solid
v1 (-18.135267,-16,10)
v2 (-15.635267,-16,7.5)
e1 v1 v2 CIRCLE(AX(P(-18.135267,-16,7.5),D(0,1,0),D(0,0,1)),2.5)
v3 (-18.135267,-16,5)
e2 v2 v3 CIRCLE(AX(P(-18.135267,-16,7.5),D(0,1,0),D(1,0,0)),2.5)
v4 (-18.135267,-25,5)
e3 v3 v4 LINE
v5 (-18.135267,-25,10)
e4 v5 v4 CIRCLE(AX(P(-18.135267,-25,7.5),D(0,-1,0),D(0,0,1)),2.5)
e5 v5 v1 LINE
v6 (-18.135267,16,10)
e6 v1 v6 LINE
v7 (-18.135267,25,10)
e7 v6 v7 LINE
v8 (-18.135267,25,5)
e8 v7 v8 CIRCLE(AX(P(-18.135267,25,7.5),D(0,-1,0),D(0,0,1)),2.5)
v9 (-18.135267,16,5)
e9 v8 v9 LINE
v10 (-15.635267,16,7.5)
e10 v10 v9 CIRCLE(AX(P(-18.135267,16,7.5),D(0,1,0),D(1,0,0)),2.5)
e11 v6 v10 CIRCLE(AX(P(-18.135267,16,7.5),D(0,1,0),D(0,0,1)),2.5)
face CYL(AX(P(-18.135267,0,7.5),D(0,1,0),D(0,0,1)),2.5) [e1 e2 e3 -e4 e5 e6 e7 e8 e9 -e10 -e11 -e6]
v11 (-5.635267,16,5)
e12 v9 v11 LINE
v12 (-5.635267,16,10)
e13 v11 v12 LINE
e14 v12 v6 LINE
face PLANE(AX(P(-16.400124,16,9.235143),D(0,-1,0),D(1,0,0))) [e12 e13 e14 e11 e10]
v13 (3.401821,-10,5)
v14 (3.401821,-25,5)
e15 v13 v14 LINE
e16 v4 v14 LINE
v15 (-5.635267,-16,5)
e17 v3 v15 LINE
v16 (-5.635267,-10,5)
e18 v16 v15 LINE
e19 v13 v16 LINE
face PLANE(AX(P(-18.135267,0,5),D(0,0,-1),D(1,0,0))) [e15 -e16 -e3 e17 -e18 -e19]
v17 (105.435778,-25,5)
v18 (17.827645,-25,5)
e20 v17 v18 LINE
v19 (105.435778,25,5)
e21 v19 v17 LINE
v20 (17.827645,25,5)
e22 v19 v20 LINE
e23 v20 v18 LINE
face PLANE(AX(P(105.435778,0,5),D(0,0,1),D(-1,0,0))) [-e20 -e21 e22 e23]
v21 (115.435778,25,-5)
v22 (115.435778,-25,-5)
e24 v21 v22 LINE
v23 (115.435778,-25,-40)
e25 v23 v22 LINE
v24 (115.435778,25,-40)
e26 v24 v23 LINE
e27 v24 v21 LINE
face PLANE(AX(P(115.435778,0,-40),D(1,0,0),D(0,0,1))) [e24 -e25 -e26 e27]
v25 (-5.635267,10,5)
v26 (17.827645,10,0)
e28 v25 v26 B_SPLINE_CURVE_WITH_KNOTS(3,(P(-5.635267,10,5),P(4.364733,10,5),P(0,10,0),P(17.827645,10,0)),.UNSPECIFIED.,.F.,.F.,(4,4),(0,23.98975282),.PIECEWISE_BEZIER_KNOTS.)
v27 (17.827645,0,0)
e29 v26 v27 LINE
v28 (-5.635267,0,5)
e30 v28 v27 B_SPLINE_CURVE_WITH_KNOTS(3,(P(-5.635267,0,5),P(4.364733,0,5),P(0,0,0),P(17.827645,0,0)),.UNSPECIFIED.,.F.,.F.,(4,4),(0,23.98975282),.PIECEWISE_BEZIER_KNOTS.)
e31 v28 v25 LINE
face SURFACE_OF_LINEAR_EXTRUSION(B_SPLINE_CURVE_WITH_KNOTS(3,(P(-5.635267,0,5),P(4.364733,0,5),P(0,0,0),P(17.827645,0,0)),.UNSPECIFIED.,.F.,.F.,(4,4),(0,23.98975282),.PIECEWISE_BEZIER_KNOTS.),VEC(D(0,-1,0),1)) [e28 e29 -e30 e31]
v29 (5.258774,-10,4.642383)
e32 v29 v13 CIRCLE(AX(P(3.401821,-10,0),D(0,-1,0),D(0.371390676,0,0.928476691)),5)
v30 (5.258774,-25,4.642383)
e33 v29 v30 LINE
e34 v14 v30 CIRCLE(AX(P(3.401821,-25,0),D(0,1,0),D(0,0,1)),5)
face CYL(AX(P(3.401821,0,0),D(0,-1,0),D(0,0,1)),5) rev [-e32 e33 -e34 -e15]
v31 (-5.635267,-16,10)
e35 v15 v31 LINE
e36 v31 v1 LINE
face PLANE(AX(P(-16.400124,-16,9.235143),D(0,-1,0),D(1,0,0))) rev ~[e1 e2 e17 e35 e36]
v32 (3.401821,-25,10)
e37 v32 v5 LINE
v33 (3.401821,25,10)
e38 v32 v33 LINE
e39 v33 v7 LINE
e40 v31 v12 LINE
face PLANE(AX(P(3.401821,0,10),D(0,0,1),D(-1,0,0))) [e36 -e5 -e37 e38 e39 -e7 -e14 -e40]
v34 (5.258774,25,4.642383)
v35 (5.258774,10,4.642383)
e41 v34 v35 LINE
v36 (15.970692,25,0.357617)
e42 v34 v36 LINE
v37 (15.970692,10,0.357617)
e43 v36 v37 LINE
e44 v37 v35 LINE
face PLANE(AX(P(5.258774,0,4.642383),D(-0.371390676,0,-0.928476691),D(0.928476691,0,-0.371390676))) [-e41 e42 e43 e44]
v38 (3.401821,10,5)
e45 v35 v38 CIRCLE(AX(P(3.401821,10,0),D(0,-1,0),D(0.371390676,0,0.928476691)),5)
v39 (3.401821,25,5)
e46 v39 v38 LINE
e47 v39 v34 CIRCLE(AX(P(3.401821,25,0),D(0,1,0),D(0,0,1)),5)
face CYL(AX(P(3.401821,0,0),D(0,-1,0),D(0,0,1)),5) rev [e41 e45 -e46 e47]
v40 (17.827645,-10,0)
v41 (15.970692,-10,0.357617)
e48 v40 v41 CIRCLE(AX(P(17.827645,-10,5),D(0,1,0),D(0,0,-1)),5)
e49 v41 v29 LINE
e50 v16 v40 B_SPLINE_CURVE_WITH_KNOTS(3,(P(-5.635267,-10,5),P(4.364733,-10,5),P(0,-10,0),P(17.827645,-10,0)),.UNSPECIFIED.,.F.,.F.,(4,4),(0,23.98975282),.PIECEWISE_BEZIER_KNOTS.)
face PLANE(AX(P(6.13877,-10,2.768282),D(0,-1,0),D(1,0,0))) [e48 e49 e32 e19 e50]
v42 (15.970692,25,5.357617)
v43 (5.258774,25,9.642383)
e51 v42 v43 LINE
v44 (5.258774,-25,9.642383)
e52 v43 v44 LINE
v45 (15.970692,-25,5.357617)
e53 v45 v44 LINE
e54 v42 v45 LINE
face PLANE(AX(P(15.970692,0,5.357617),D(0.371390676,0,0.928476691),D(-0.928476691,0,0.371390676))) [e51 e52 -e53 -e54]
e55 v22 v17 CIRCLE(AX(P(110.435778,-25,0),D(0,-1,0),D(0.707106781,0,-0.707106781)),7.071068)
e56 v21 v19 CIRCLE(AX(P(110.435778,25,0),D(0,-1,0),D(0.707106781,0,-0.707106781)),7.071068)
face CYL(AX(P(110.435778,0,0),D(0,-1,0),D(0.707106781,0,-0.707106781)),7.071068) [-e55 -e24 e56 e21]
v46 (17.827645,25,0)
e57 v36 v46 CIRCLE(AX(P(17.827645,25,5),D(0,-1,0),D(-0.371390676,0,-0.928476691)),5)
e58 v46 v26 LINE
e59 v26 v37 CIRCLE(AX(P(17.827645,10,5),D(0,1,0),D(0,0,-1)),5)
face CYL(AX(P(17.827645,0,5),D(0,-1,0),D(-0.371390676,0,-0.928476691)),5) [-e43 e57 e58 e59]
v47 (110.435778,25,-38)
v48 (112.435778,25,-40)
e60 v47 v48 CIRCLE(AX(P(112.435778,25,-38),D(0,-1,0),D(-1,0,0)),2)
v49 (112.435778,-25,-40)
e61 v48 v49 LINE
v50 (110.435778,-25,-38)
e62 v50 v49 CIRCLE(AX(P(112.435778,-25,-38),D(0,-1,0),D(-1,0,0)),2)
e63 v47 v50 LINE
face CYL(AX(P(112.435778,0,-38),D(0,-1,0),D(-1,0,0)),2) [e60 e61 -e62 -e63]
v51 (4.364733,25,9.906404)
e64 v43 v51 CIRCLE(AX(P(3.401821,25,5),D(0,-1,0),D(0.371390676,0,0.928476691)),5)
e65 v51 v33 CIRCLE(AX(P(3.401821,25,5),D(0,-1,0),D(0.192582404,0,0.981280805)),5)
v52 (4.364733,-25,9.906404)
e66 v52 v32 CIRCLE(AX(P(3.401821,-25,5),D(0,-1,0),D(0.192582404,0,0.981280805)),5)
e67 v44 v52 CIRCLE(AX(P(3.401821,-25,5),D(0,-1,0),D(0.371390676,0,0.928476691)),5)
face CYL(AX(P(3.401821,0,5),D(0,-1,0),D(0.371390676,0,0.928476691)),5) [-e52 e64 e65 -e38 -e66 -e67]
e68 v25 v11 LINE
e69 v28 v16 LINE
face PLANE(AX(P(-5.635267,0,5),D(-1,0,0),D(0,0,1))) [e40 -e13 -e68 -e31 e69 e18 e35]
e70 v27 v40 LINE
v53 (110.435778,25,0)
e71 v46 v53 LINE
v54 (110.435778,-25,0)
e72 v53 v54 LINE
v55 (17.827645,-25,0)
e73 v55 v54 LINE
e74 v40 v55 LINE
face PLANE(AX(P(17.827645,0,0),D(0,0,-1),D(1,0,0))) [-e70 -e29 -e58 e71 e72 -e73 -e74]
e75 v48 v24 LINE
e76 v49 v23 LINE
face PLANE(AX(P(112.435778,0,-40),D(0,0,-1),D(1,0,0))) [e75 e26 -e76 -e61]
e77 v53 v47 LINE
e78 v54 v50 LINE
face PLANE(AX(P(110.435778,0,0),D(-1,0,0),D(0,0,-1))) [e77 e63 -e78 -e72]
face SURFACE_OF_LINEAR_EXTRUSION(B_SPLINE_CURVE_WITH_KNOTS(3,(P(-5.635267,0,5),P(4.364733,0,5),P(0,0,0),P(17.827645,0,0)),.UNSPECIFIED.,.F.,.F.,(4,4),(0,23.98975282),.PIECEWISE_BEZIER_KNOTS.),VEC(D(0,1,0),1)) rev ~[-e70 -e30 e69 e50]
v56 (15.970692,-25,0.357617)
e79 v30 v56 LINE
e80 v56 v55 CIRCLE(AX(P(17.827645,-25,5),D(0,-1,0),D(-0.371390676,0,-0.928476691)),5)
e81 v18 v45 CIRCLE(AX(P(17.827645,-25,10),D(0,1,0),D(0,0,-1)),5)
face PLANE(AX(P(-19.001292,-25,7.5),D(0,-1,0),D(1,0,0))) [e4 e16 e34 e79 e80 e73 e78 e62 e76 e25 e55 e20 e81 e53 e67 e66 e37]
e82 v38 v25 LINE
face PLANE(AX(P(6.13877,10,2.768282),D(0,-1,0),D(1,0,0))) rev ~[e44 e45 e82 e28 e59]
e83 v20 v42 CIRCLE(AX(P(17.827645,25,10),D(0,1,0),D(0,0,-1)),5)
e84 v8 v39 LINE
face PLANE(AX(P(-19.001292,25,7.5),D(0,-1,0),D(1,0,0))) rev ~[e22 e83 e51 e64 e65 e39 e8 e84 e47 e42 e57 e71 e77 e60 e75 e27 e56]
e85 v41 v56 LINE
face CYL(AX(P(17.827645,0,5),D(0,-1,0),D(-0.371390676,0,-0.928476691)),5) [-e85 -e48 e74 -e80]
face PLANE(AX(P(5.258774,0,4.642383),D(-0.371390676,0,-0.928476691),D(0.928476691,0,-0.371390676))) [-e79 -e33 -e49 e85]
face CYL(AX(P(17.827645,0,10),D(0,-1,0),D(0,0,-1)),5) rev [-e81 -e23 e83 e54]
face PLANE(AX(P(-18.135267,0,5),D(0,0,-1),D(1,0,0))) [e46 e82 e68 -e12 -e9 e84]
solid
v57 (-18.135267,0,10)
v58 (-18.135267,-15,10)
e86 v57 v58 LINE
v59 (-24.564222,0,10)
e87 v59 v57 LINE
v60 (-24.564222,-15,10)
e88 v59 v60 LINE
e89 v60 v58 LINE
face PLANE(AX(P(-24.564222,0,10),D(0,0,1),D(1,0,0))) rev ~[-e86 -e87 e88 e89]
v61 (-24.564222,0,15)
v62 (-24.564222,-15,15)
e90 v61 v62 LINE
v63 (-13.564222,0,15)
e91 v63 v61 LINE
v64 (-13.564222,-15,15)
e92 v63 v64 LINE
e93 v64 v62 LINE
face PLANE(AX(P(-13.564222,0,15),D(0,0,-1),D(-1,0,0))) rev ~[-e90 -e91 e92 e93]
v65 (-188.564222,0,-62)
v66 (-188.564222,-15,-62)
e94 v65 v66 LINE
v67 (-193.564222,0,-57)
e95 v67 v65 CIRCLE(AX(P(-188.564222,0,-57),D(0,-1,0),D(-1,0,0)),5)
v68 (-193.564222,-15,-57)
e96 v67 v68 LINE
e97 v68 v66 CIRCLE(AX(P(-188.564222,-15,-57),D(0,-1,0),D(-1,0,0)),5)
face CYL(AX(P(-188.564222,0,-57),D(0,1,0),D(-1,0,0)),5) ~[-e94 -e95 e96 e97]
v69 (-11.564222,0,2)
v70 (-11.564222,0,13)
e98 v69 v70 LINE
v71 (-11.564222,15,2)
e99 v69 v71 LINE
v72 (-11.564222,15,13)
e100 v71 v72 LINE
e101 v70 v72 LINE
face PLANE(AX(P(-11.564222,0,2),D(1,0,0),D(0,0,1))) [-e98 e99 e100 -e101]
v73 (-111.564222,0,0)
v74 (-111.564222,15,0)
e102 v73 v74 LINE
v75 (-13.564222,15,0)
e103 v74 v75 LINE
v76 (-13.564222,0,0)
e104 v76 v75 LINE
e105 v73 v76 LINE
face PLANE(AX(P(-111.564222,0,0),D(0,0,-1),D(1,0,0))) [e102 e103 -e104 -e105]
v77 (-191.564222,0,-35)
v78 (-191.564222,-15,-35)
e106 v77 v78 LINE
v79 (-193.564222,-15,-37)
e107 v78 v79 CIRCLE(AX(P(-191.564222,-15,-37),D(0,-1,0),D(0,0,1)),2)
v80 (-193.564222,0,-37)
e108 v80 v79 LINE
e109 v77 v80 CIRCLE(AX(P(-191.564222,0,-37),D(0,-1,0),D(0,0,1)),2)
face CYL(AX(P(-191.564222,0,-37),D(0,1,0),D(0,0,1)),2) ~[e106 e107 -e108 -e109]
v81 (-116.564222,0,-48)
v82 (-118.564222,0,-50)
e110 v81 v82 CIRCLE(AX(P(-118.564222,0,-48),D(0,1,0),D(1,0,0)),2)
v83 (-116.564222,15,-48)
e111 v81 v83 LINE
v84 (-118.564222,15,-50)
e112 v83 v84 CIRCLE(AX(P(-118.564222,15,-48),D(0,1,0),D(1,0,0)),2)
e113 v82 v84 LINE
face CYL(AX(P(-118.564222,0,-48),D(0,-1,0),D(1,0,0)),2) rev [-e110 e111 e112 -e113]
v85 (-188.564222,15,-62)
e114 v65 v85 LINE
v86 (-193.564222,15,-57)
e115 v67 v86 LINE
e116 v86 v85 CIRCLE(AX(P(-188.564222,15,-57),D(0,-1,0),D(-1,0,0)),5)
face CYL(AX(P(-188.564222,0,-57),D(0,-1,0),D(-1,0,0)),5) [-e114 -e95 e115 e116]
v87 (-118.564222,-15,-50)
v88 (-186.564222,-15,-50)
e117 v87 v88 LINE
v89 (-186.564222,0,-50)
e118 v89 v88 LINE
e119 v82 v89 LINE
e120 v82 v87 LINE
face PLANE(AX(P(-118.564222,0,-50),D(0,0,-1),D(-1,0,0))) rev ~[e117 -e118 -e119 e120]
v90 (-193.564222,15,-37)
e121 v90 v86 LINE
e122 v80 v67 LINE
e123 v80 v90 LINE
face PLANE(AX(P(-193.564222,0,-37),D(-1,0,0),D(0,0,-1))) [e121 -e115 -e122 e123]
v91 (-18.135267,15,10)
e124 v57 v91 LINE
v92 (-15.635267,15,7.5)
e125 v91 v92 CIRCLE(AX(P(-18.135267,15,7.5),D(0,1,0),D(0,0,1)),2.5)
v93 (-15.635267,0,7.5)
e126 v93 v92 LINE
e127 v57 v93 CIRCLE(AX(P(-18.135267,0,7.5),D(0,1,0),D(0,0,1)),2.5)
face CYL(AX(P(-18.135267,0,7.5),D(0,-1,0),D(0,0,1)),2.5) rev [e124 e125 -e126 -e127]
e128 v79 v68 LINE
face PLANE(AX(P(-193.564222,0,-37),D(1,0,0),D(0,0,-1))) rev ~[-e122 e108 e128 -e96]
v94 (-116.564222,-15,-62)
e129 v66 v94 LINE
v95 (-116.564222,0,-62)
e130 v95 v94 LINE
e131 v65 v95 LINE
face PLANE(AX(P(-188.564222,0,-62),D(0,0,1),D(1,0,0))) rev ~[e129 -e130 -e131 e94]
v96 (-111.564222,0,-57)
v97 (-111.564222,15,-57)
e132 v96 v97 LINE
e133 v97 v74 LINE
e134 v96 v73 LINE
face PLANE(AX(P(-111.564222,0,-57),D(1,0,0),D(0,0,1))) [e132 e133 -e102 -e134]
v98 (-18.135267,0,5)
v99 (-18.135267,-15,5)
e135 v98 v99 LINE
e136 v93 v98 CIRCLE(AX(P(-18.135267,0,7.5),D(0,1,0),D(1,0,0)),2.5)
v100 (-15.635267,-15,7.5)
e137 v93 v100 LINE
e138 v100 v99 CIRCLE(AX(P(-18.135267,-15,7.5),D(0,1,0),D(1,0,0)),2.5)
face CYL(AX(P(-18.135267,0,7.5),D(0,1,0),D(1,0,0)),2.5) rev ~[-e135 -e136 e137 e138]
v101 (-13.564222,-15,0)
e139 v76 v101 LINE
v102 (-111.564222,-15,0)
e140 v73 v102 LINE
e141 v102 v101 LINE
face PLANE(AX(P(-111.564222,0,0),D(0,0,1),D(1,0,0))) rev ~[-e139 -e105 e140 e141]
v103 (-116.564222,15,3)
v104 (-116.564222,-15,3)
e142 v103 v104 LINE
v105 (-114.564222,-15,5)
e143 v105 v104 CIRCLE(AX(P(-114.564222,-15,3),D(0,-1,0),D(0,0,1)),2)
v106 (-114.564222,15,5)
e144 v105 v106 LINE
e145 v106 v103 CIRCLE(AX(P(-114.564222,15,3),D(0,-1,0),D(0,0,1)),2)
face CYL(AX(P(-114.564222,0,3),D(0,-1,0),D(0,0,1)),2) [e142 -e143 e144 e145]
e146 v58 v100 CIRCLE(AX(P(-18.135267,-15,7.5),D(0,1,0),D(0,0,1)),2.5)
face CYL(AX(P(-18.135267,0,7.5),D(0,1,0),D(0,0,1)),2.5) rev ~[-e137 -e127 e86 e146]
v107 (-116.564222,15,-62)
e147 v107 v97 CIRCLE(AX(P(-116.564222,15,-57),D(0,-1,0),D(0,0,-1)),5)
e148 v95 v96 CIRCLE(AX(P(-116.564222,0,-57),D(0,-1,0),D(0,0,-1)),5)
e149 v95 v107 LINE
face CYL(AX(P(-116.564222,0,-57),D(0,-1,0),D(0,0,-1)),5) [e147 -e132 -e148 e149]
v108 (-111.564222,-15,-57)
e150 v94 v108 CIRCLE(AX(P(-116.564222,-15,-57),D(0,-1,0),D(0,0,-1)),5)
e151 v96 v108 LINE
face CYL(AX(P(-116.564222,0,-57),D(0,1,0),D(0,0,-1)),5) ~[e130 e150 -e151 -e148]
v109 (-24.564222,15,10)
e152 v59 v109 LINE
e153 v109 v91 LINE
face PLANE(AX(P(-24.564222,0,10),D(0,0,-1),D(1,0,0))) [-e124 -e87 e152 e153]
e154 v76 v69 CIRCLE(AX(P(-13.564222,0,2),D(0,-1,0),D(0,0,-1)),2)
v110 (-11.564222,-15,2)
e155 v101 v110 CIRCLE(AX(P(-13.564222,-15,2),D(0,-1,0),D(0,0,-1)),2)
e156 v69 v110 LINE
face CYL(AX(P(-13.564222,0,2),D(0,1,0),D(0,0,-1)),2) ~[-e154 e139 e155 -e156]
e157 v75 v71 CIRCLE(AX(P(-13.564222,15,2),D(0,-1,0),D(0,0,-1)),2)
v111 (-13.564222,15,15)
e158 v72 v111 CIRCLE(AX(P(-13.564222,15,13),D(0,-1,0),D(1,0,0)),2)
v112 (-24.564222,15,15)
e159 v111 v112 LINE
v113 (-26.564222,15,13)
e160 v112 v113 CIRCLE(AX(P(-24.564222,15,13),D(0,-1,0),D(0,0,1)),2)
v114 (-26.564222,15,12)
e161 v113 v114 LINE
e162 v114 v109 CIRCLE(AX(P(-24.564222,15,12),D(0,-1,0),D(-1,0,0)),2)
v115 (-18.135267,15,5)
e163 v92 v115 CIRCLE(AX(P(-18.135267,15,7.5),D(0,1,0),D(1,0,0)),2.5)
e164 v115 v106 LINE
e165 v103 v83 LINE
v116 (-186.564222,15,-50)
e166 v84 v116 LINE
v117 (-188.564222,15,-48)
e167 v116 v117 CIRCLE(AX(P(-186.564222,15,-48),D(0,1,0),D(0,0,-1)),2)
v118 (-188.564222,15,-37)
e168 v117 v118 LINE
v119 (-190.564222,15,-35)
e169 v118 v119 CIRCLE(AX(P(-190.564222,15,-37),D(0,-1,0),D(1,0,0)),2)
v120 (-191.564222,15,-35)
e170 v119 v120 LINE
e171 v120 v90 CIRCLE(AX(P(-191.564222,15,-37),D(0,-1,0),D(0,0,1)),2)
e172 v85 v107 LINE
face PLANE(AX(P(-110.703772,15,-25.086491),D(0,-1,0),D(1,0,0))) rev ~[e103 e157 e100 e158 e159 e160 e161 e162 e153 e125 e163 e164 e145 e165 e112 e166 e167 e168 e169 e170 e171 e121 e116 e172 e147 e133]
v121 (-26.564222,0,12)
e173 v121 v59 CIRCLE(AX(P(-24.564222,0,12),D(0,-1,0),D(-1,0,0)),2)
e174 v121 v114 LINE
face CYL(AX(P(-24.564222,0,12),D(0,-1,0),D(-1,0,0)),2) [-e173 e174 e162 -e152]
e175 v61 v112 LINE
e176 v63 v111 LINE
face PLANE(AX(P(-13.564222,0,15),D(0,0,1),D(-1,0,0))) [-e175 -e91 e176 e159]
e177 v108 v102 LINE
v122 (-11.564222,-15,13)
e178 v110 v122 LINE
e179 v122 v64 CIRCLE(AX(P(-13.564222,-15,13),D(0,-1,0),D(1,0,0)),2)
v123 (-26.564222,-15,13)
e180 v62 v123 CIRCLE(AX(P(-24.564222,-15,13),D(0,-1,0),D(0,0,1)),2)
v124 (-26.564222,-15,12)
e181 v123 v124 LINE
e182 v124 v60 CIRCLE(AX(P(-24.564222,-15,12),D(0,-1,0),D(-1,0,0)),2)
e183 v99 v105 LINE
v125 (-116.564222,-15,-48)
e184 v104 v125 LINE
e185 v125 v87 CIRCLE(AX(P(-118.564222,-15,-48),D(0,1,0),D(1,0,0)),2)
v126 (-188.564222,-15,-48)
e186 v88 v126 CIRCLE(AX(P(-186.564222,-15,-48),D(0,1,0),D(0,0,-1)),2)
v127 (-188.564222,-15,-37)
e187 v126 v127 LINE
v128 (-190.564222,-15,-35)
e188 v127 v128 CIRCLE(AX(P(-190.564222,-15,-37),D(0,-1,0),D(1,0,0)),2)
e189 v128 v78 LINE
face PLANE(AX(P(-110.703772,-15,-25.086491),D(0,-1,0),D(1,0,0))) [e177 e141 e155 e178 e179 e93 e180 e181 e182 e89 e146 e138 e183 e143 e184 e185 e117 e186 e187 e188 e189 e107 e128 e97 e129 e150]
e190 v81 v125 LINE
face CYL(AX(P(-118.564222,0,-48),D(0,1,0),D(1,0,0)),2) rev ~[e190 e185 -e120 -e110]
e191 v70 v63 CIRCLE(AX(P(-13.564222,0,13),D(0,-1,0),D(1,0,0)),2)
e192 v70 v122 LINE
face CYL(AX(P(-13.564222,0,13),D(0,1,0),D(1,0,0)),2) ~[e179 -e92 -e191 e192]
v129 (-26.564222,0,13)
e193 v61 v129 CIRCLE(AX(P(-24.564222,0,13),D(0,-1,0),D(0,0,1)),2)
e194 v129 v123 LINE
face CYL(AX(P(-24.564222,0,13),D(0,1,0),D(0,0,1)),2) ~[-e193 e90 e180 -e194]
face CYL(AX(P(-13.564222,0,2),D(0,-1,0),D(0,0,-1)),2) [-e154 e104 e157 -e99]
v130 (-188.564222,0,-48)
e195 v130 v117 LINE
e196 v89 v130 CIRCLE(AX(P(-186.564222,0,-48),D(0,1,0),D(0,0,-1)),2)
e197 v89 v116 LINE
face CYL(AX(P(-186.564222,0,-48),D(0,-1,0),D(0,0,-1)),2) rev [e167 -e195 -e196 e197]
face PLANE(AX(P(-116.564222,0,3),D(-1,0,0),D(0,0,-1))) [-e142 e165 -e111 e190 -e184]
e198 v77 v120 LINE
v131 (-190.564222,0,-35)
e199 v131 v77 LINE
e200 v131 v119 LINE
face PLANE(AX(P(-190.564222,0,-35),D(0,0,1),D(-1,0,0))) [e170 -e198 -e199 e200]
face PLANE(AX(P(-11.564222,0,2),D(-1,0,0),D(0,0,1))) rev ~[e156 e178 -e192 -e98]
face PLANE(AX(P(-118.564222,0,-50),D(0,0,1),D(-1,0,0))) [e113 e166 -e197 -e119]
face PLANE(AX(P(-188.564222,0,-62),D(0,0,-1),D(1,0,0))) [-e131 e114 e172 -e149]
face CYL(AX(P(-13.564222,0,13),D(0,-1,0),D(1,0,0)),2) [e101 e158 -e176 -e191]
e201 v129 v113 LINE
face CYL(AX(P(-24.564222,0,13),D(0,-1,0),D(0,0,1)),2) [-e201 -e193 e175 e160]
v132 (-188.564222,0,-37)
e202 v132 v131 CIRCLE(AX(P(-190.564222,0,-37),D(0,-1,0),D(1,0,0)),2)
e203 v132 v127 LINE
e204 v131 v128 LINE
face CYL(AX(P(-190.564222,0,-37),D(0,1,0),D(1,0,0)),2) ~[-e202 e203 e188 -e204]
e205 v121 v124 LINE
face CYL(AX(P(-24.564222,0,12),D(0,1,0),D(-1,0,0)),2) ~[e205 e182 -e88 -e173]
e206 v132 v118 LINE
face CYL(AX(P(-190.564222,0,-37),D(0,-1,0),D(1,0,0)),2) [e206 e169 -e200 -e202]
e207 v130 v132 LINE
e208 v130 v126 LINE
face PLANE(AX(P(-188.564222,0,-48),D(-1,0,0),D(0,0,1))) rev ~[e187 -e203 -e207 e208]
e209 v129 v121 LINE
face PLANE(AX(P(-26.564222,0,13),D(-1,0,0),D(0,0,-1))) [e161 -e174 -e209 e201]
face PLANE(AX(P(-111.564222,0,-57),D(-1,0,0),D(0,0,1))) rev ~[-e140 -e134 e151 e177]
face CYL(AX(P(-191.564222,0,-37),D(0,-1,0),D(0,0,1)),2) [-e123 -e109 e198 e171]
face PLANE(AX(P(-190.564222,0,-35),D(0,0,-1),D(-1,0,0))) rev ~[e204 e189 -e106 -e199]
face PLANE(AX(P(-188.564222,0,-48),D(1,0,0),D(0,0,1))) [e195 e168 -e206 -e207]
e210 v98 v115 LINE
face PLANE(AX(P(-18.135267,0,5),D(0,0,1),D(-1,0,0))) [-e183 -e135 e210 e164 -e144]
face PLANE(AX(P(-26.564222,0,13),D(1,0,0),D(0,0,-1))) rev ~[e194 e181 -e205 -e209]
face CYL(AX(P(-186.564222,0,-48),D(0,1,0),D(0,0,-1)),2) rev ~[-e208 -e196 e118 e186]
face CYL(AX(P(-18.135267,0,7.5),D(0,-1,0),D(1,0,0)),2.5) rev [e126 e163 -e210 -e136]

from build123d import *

# Parameters (mm, degrees)
F1_DEPTH      = 15
F1_DEPTH_BACK = 15
F0_W          = 5.9289547801
F0_H          = 5
F2_DEPTH      = 25
F2_DEPTH_BACK = 25
F3_DEPTH      = 16
F3_DEPTH_BACK = 16
F4_DEPTH      = 10
F4_DEPTH_BACK = 10


with BuildPart() as f1:
    # F0 (on Front) → F1 (new body, two sides)
    with BuildSketch(Plane.XZ) as f1_sk:
        with BuildLine():
            Line((-18.1352669001, 5), (-111.5642216802, 5))
            Line((-111.5642216802, 5), (-114.5642216802, 5))
            ThreePointArc((-114.5642216802, 5), (-115.9784352425, 4.4142135624), (-116.5642216802, 3))
            Line((-116.5642216802, 3), (-116.5642216802, -48))
            ThreePointArc((-116.5642216802, -48), (-117.1500081178, -49.4142135624), (-118.5642216802, -50))
            Line((-118.5642216802, -50), (-186.5642216802, -50))
            ThreePointArc((-186.5642216802, -50), (-187.9784352425, -49.4142135624), (-188.5642216802, -48))
            Line((-188.5642216802, -48), (-188.5642216802, -37))
            ThreePointArc((-188.5642216802, -37), (-189.1500081178, -35.5857864376), (-190.5642216802, -35))
            Line((-190.5642216802, -35), (-191.5642216802, -35))
            ThreePointArc((-191.5642216802, -35), (-192.9784352425, -35.5857864376), (-193.5642216802, -37))
            Line((-193.5642216802, -37), (-193.5642216802, -50))
            Line((-193.5642216802, -50), (-193.5642216802, -57))
            ThreePointArc((-193.5642216802, -57), (-192.0997555861, -60.5355339059), (-188.5642216802, -62))
            Line((-188.5642216802, -62), (-116.5642216802, -62))
            ThreePointArc((-116.5642216802, -62), (-113.0286877742, -60.5355339059), (-111.5642216802, -57))
            Line((-111.5642216802, -57), (-111.5642216802, -50))
            Line((-111.5642216802, -50), (-111.5642216802, 0))
            Line((-111.5642216802, 0), (-13.5642216802, 0))
            ThreePointArc((-13.5642216802, 0), (-12.1500081178, 0.5857864376), (-11.5642216802, 2))
            Line((-11.5642216802, 2), (-11.5642216802, 5))
            Line((-11.5642216802, 5), (-15.6352669001, 5))
            Line((-15.6352669001, 5), (-18.1352669001, 5))
        make_face()
        with BuildLine():
            Line((-24.5642216802, 10), (-18.1352669001, 10))
            Line((-18.1352669001, 10), (-15.6352669001, 10))
            Line((-15.6352669001, 10), (-11.5642216802, 10))
            Line((-11.5642216802, 10), (-11.5642216802, 13))
            ThreePointArc((-11.5642216802, 13), (-12.1500081178, 14.4142135624), (-13.5642216802, 15))
            Line((-13.5642216802, 15), (-24.5642216802, 15))
            ThreePointArc((-24.5642216802, 15), (-25.9784352425, 14.4142135624), (-26.5642216802, 13))
            Line((-26.5642216802, 13), (-26.5642216802, 12))
            ThreePointArc((-26.5642216802, 12), (-25.9784352425, 10.5857864376), (-24.5642216802, 10))
        make_face()
        with BuildLine():
            Line((-15.6352669001, 10), (-18.1352669001, 10))
            ThreePointArc((-18.1352669001, 10), (-16.3674999471, 9.267766953), (-15.6352669001, 7.5))
            Line((-15.6352669001, 7.5), (-15.6352669001, 10))
        make_face()
        Polygon((-15.6352669001, 7.5), (-15.6352669001, 5), (-11.5642216802, 5), (-11.5642216802, 10), (-15.6352669001, 10), align=None)
        with BuildLine():
            ThreePointArc((-15.6352669001, 7.5), (-16.3674999471, 5.732233047), (-18.1352669001, 5))
            Line((-18.1352669001, 5), (-15.6352669001, 5))
            Line((-15.6352669001, 5), (-15.6352669001, 7.5))
        make_face()
    extrude(amount=F1_DEPTH)
    extrude(f1_sk.sketch, amount=-F1_DEPTH_BACK)


with BuildPart() as f2:
    # F0 (on Front) → F2 (new body, two sides)
    with BuildSketch(Plane.XZ) as f2_sk:
        with BuildLine():
            ThreePointArc((-18.1352669001, 10), (-20.6352669001, 7.5), (-18.1352669001, 5))
            Line((-18.1352669001, 5), (-18.1352669001, 10))
        make_face()
        with BuildLine():
            Line((-18.1352669001, 10), (-18.1352669001, 5))
            ThreePointArc((-18.1352669001, 5), (-16.3674999471, 5.732233047), (-15.6352669001, 7.5))
            ThreePointArc((-15.6352669001, 7.5), (-16.3674999471, 9.267766953), (-18.1352669001, 10))
        make_face()
        with BuildLine():
            Line((-15.6352669001, 10), (-18.1352669001, 10))
            ThreePointArc((-18.1352669001, 10), (-16.3674999471, 9.267766953), (-15.6352669001, 7.5))
            Line((-15.6352669001, 7.5), (-15.6352669001, 10))
        make_face()
        with BuildLine():
            ThreePointArc((-15.6352669001, 7.5), (-16.3674999471, 5.732233047), (-18.1352669001, 5))
            Line((-18.1352669001, 5), (-15.6352669001, 5))
            Line((-15.6352669001, 5), (-15.6352669001, 7.5))
        make_face()
        Polygon((-15.6352669001, 7.5), (-15.6352669001, 5), (-11.5642216802, 5), (-11.5642216802, 10), (-15.6352669001, 10), align=None)
        with Locations((-8.5997442901, 7.5)):
            Rectangle(F0_W, F0_H)
        with BuildLine():
            Line((-5.6352669001, 10), (-5.6352669001, 5))
            Line((-5.6352669001, 5), (3.4018210821, 5))
            ThreePointArc((3.4018210821, 5), (4.3473586879, 4.9097819337), (5.2587744639, 4.6423834544))
            Line((5.2587744639, 4.6423834544), (15.970691736, 0.3576165456))
            ThreePointArc((15.970691736, 0.3576165456), (16.882107512, 0.0902180663), (17.8276451178, 0))
            Line((17.8276451178, 0), (110.4357783198, 0))
            Line((110.4357783198, 0), (110.4357783198, -38))
            ThreePointArc((110.4357783198, -38), (111.0215647575, -39.4142135624), (112.4357783198, -40))
            Line((112.4357783198, -40), (115.4357783198, -40))
            Line((115.4357783198, -40), (115.4357783198, -5))
            ThreePointArc((115.4357783198, -5), (115.4357783198, 5), (105.4357783198, 5))
            Line((105.4357783198, 5), (17.8276451178, 5))
            ThreePointArc((17.8276451178, 5), (16.882107512, 5.0902180663), (15.970691736, 5.3576165456))
            Line((15.970691736, 5.3576165456), (5.2587744639, 9.6423834544))
            ThreePointArc((5.2587744639, 9.6423834544), (4.8179202782, 9.7952750773), (4.3647330999, 9.9064040239))
            ThreePointArc((4.3647330999, 9.9064040239), (3.8855461489, 9.976545997), (3.4018210821, 10))
            Line((3.4018210821, 10), (-5.6352669001, 10))
        make_face()
    extrude(amount=F2_DEPTH)
    extrude(f2_sk.sketch, amount=-F2_DEPTH_BACK)

    # F0 (on Front) → F3 (cut, two sides)
    with BuildSketch(Plane.XZ) as f3_sk:
        with BuildLine():
            Line((-15.6352669001, 10), (-18.1352669001, 10))
            ThreePointArc((-18.1352669001, 10), (-16.3674999471, 9.267766953), (-15.6352669001, 7.5))
            Line((-15.6352669001, 7.5), (-15.6352669001, 10))
        make_face()
        with BuildLine():
            ThreePointArc((-15.6352669001, 7.5), (-16.3674999471, 5.732233047), (-18.1352669001, 5))
            Line((-18.1352669001, 5), (-15.6352669001, 5))
            Line((-15.6352669001, 5), (-15.6352669001, 7.5))
        make_face()
        Polygon((-15.6352669001, 7.5), (-15.6352669001, 5), (-11.5642216802, 5), (-11.5642216802, 10), (-15.6352669001, 10), align=None)
        with Locations((-8.5997442901, 7.5)):
            Rectangle(F0_W, F0_H)
    extrude(amount=-F3_DEPTH, mode=Mode.SUBTRACT)
    extrude(f3_sk.sketch, amount=F3_DEPTH_BACK, mode=Mode.SUBTRACT)

    # F0 (on Front) → F4 (join, two sides)
    with BuildSketch(Plane.XZ) as f4_sk:
        with BuildLine():
            Line((3.4018210821, 5), (-5.6352669001, 5))
            add(Edge.make_bspline(
                [(-5.6352669001, 5), (4.3647330999, 5), (0, 0), (17.8276451178, 0)],
                knots=[0, 0, 0, 0, 23.9897528198, 23.9897528198, 23.9897528198, 23.9897528198], degree=3))
            ThreePointArc((17.8276451178, 0), (16.882107512, 0.0902180663), (15.970691736, 0.3576165456))
            Line((15.970691736, 0.3576165456), (5.2587744639, 4.6423834544))
            ThreePointArc((5.2587744639, 4.6423834544), (4.3473586879, 4.9097819337), (3.4018210821, 5))
        make_face()
    extrude(amount=F4_DEPTH)
    extrude(f4_sk.sketch, amount=-F4_DEPTH_BACK)


solid = Compound([f1.part, f2.part])
